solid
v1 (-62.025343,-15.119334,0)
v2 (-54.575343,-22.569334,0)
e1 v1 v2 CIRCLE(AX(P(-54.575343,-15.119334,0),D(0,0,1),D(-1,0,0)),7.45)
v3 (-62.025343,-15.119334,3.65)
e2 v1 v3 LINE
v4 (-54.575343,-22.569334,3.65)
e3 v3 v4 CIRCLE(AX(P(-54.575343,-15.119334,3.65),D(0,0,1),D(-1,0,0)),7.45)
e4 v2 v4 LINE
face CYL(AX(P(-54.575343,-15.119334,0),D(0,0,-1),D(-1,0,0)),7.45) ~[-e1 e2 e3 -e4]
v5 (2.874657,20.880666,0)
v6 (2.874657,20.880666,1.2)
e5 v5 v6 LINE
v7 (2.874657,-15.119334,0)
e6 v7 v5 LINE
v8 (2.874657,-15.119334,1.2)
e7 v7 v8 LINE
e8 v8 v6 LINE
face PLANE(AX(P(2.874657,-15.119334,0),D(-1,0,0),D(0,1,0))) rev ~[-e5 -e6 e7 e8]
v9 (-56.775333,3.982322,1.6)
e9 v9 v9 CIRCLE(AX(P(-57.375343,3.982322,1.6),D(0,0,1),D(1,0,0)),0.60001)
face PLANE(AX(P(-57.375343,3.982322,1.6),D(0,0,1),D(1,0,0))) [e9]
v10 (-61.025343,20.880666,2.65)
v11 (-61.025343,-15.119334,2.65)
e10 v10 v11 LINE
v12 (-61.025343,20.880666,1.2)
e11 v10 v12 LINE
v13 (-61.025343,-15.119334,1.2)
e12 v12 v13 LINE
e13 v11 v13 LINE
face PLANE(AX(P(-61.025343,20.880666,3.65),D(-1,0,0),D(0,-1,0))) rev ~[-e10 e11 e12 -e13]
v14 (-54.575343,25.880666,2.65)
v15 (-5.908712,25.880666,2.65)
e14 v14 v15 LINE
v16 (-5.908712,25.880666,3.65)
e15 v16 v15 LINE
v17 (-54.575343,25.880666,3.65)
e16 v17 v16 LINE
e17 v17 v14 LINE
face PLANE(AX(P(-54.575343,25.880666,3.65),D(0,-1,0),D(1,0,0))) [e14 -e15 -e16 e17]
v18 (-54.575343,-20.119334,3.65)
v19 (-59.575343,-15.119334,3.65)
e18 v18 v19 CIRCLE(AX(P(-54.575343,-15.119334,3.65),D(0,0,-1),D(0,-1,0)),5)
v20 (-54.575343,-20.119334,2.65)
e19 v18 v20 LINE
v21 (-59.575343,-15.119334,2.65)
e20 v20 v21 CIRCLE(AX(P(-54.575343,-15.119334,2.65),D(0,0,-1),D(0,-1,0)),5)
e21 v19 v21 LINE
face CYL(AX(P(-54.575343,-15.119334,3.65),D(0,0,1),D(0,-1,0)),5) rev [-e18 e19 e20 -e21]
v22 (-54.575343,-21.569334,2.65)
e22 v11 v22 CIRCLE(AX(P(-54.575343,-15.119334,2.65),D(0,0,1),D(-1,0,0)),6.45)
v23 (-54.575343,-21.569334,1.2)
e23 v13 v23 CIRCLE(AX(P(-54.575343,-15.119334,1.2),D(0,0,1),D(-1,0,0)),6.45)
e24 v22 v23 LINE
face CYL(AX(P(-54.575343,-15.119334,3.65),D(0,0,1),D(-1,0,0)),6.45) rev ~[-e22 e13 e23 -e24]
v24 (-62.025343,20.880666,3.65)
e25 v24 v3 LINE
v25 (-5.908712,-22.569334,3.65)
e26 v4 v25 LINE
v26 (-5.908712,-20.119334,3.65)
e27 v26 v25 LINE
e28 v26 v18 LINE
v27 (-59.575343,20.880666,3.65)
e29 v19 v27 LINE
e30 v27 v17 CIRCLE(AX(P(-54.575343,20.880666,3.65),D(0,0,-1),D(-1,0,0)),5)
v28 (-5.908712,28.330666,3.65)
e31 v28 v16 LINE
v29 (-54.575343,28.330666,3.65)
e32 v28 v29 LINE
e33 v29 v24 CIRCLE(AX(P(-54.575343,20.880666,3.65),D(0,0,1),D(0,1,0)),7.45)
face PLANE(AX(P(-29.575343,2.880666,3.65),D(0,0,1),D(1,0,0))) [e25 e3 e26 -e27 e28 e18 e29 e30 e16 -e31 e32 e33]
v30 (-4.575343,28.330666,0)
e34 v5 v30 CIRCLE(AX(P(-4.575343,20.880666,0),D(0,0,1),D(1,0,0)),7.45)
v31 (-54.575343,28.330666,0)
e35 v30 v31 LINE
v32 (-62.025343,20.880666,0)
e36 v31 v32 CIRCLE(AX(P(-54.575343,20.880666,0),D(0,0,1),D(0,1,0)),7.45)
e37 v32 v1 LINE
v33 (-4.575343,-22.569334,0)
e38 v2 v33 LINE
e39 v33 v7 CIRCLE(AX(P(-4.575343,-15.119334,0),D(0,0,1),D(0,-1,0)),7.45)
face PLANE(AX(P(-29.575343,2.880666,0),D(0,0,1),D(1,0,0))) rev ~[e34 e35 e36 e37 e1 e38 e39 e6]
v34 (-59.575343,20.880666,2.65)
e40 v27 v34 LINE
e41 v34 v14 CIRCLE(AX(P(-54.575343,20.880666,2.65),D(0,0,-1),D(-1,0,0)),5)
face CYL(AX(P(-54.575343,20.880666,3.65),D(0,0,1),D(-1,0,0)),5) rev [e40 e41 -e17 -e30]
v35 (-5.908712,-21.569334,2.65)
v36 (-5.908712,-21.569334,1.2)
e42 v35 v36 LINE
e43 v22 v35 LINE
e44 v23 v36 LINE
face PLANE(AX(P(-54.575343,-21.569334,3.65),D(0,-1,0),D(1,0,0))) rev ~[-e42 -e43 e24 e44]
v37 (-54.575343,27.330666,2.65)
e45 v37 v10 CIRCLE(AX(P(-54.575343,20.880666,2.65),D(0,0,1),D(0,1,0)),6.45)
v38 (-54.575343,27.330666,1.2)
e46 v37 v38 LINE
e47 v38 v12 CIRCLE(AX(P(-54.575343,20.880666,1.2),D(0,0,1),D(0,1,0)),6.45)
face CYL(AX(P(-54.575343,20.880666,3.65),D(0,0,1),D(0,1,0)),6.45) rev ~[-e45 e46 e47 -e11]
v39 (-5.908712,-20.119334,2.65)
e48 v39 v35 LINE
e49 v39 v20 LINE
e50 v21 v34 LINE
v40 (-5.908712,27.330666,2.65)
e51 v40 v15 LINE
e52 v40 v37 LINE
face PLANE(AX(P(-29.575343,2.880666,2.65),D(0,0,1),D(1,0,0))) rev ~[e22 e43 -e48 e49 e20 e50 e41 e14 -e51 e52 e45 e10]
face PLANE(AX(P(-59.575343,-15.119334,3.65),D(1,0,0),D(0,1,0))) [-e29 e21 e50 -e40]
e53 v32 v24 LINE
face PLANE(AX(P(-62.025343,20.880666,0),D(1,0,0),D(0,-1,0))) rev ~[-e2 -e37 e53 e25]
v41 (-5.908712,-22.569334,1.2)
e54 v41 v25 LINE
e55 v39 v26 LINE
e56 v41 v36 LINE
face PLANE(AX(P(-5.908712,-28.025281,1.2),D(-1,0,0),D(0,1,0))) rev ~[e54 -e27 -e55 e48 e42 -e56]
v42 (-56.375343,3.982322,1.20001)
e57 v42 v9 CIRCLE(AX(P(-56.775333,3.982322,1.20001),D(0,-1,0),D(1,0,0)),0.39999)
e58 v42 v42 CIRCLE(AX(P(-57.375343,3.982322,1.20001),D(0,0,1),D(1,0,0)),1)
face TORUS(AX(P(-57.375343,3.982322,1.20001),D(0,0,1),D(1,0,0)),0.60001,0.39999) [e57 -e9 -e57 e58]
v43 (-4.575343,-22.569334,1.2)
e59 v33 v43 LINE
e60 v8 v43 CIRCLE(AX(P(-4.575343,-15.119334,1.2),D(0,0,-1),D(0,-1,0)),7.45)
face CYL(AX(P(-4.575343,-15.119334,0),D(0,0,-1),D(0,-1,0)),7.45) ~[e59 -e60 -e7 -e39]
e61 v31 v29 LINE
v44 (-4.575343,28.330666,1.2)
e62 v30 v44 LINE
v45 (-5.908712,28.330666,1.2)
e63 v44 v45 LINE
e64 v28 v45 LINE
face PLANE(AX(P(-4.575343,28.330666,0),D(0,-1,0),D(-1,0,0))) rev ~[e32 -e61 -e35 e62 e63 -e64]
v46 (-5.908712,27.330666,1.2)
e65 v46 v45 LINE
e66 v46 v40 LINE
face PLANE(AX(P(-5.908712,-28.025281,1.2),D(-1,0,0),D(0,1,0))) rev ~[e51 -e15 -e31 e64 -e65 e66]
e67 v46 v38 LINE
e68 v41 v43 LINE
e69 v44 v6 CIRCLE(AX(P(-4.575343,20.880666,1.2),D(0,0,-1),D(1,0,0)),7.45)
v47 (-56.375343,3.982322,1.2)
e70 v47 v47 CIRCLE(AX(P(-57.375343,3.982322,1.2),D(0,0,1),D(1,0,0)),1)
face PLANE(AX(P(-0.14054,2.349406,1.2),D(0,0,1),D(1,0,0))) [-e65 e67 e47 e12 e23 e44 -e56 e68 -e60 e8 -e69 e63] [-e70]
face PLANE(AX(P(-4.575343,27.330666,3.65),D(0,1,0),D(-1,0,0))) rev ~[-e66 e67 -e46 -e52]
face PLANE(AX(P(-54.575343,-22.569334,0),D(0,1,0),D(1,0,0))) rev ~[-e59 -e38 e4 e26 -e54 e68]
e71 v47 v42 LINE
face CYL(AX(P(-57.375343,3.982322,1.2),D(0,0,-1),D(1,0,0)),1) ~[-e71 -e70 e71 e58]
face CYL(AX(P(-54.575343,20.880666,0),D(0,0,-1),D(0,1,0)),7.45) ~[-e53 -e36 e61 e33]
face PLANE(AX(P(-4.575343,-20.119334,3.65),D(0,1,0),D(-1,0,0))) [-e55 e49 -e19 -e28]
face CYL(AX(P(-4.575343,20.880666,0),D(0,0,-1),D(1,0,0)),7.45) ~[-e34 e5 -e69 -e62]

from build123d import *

# Parameters (mm, degrees)
F1_DEPTH = 3.65
F3_DEPTH = 2.45
F5_DEPTH = 1
F6_W     = 11.5363439545
F6_H     = 60.74937433
F7_DEPTH = 25
F8_R     = 1
F9_DEPTH = 0.4
F10_R    = 0.39999


# Not quite as in the source:
# - a fillet or chamfer is up to 0.001 mm smaller than in the source, because OpenCascade refuses the exact size


with BuildPart() as f1:
    # F0 (on Top) → F1 (new body)
    with BuildSketch(Plane.XY):
        with BuildLine():
            ThreePointArc((-62.0253431911, -15.11933375), (-59.843288711, -20.3872792698), (-54.5753431911, -22.56933375))
            Line((-54.5753431911, -22.56933375), (-4.5753431911, -22.56933375))
            ThreePointArc((-4.5753431911, -22.56933375), (0.6926023287, -20.3872792698), (2.8746568089, -15.11933375))
            Line((2.8746568089, -15.11933375), (2.8746568089, 20.88066625))
            ThreePointArc((2.8746568089, 20.88066625), (0.6926023287, 26.1486117698), (-4.5753431911, 28.33066625))
            Line((-4.5753431911, 28.33066625), (-54.5753431911, 28.33066625))
            ThreePointArc((-54.5753431911, 28.33066625), (-59.843288711, 26.1486117698), (-62.0253431911, 20.88066625))
            Line((-62.0253431911, 20.88066625), (-62.0253431911, -15.11933375))
        make_face()
    extrude(amount=F1_DEPTH)

    # F2 (on face) → F3 (cut)
    with BuildSketch(Plane.XY.offset(3.65)):
        with BuildLine():
            Line((1.8746568089, -15.11933375), (1.8746568089, 20.88066625))
            ThreePointArc((1.8746568089, 20.88066625), (-0.0145044525, 25.4415049886), (-4.5753431911, 27.33066625))
            Line((-4.5753431911, 27.33066625), (-54.5753431911, 27.33066625))
            ThreePointArc((-54.5753431911, 27.33066625), (-59.1361819298, 25.4415049886), (-61.0253431911, 20.88066625))
            Line((-61.0253431911, 20.88066625), (-61.0253431911, -15.11933375))
            ThreePointArc((-61.0253431911, -15.11933375), (-59.1361819298, -19.6801724887), (-54.5753431911, -21.56933375))
            Line((-54.5753431911, -21.56933375), (-4.5753431911, -21.56933375))
            ThreePointArc((-4.5753431911, -21.56933375), (-0.0145044525, -19.6801724887), (1.8746568089, -15.11933375))
        make_face()
    extrude(amount=-F3_DEPTH, mode=Mode.SUBTRACT)

    # F4 (on face) → F5 (join)
    with BuildSketch(Plane.XY.offset(3.65)):
        with BuildLine():
            Line((1.8746568089, -15.11933375), (1.8746568089, 20.88066625))
            ThreePointArc((1.8746568089, 20.88066625), (-0.0145044525, 25.4415049886), (-4.5753431911, 27.33066625))
            Line((-4.5753431911, 27.33066625), (-54.5753431911, 27.33066625))
            ThreePointArc((-54.5753431911, 27.33066625), (-59.1361819298, 25.4415049886), (-61.0253431911, 20.88066625))
            Line((-61.0253431911, 20.88066625), (-61.0253431911, -15.11933375))
            ThreePointArc((-61.0253431911, -15.11933375), (-59.1361819298, -19.6801724887), (-54.5753431911, -21.56933375))
            Line((-54.5753431911, -21.56933375), (-4.5753431911, -21.56933375))
            ThreePointArc((-4.5753431911, -21.56933375), (-0.0145044525, -19.6801724887), (1.8746568089, -15.11933375))
        make_face()
        with BuildLine():
            ThreePointArc((-4.5753431911, 25.88066625), (-1.0398092852, 24.4162001559), (0.4246568089, 20.88066625))
            Line((0.4246568089, 20.88066625), (0.4246568089, -15.11933375))
            ThreePointArc((0.4246568089, -15.11933375), (-1.0398092852, -18.6548676559), (-4.5753431911, -20.11933375))
            Line((-4.5753431911, -20.11933375), (-54.5753431911, -20.11933375))
            ThreePointArc((-54.5753431911, -20.11933375), (-58.1108770971, -18.6548676559), (-59.5753431911, -15.11933375))
            Line((-59.5753431911, -15.11933375), (-59.5753431911, 20.88066625))
            ThreePointArc((-59.5753431911, 20.88066625), (-58.1108770971, 24.4162001559), (-54.5753431911, 25.88066625))
            Line((-54.5753431911, 25.88066625), (-4.5753431911, 25.88066625))
        make_face(mode=Mode.SUBTRACT)
    extrude(amount=-F5_DEPTH)

    # F6 (on face) → F7 (cut)
    with BuildSketch(Plane.XY.offset(1.2)):
        with Locations((-0.1405403018, 2.3494064808)):
            Rectangle(F6_W, F6_H)
    extrude(amount=F7_DEPTH, mode=Mode.SUBTRACT)

    # F8 (on face) → F9 (join)
    with BuildSketch(Plane.XY.offset(1.2)):
        with Locations((-57.3753431911, 3.9823222905)):
            Circle(F8_R)
    extrude(amount=F9_DEPTH)

    # F10 (radius 0.4 in the source; OpenCascade refuses exactly that, so slightly less here)
    f10_edges = [f1.edges().sort_by_distance(p)[0] for p in [
        (-58.375343, 3.982322, 1.6),
    ]]
    fillet(f10_edges, radius=F10_R)


solid = f1.part
